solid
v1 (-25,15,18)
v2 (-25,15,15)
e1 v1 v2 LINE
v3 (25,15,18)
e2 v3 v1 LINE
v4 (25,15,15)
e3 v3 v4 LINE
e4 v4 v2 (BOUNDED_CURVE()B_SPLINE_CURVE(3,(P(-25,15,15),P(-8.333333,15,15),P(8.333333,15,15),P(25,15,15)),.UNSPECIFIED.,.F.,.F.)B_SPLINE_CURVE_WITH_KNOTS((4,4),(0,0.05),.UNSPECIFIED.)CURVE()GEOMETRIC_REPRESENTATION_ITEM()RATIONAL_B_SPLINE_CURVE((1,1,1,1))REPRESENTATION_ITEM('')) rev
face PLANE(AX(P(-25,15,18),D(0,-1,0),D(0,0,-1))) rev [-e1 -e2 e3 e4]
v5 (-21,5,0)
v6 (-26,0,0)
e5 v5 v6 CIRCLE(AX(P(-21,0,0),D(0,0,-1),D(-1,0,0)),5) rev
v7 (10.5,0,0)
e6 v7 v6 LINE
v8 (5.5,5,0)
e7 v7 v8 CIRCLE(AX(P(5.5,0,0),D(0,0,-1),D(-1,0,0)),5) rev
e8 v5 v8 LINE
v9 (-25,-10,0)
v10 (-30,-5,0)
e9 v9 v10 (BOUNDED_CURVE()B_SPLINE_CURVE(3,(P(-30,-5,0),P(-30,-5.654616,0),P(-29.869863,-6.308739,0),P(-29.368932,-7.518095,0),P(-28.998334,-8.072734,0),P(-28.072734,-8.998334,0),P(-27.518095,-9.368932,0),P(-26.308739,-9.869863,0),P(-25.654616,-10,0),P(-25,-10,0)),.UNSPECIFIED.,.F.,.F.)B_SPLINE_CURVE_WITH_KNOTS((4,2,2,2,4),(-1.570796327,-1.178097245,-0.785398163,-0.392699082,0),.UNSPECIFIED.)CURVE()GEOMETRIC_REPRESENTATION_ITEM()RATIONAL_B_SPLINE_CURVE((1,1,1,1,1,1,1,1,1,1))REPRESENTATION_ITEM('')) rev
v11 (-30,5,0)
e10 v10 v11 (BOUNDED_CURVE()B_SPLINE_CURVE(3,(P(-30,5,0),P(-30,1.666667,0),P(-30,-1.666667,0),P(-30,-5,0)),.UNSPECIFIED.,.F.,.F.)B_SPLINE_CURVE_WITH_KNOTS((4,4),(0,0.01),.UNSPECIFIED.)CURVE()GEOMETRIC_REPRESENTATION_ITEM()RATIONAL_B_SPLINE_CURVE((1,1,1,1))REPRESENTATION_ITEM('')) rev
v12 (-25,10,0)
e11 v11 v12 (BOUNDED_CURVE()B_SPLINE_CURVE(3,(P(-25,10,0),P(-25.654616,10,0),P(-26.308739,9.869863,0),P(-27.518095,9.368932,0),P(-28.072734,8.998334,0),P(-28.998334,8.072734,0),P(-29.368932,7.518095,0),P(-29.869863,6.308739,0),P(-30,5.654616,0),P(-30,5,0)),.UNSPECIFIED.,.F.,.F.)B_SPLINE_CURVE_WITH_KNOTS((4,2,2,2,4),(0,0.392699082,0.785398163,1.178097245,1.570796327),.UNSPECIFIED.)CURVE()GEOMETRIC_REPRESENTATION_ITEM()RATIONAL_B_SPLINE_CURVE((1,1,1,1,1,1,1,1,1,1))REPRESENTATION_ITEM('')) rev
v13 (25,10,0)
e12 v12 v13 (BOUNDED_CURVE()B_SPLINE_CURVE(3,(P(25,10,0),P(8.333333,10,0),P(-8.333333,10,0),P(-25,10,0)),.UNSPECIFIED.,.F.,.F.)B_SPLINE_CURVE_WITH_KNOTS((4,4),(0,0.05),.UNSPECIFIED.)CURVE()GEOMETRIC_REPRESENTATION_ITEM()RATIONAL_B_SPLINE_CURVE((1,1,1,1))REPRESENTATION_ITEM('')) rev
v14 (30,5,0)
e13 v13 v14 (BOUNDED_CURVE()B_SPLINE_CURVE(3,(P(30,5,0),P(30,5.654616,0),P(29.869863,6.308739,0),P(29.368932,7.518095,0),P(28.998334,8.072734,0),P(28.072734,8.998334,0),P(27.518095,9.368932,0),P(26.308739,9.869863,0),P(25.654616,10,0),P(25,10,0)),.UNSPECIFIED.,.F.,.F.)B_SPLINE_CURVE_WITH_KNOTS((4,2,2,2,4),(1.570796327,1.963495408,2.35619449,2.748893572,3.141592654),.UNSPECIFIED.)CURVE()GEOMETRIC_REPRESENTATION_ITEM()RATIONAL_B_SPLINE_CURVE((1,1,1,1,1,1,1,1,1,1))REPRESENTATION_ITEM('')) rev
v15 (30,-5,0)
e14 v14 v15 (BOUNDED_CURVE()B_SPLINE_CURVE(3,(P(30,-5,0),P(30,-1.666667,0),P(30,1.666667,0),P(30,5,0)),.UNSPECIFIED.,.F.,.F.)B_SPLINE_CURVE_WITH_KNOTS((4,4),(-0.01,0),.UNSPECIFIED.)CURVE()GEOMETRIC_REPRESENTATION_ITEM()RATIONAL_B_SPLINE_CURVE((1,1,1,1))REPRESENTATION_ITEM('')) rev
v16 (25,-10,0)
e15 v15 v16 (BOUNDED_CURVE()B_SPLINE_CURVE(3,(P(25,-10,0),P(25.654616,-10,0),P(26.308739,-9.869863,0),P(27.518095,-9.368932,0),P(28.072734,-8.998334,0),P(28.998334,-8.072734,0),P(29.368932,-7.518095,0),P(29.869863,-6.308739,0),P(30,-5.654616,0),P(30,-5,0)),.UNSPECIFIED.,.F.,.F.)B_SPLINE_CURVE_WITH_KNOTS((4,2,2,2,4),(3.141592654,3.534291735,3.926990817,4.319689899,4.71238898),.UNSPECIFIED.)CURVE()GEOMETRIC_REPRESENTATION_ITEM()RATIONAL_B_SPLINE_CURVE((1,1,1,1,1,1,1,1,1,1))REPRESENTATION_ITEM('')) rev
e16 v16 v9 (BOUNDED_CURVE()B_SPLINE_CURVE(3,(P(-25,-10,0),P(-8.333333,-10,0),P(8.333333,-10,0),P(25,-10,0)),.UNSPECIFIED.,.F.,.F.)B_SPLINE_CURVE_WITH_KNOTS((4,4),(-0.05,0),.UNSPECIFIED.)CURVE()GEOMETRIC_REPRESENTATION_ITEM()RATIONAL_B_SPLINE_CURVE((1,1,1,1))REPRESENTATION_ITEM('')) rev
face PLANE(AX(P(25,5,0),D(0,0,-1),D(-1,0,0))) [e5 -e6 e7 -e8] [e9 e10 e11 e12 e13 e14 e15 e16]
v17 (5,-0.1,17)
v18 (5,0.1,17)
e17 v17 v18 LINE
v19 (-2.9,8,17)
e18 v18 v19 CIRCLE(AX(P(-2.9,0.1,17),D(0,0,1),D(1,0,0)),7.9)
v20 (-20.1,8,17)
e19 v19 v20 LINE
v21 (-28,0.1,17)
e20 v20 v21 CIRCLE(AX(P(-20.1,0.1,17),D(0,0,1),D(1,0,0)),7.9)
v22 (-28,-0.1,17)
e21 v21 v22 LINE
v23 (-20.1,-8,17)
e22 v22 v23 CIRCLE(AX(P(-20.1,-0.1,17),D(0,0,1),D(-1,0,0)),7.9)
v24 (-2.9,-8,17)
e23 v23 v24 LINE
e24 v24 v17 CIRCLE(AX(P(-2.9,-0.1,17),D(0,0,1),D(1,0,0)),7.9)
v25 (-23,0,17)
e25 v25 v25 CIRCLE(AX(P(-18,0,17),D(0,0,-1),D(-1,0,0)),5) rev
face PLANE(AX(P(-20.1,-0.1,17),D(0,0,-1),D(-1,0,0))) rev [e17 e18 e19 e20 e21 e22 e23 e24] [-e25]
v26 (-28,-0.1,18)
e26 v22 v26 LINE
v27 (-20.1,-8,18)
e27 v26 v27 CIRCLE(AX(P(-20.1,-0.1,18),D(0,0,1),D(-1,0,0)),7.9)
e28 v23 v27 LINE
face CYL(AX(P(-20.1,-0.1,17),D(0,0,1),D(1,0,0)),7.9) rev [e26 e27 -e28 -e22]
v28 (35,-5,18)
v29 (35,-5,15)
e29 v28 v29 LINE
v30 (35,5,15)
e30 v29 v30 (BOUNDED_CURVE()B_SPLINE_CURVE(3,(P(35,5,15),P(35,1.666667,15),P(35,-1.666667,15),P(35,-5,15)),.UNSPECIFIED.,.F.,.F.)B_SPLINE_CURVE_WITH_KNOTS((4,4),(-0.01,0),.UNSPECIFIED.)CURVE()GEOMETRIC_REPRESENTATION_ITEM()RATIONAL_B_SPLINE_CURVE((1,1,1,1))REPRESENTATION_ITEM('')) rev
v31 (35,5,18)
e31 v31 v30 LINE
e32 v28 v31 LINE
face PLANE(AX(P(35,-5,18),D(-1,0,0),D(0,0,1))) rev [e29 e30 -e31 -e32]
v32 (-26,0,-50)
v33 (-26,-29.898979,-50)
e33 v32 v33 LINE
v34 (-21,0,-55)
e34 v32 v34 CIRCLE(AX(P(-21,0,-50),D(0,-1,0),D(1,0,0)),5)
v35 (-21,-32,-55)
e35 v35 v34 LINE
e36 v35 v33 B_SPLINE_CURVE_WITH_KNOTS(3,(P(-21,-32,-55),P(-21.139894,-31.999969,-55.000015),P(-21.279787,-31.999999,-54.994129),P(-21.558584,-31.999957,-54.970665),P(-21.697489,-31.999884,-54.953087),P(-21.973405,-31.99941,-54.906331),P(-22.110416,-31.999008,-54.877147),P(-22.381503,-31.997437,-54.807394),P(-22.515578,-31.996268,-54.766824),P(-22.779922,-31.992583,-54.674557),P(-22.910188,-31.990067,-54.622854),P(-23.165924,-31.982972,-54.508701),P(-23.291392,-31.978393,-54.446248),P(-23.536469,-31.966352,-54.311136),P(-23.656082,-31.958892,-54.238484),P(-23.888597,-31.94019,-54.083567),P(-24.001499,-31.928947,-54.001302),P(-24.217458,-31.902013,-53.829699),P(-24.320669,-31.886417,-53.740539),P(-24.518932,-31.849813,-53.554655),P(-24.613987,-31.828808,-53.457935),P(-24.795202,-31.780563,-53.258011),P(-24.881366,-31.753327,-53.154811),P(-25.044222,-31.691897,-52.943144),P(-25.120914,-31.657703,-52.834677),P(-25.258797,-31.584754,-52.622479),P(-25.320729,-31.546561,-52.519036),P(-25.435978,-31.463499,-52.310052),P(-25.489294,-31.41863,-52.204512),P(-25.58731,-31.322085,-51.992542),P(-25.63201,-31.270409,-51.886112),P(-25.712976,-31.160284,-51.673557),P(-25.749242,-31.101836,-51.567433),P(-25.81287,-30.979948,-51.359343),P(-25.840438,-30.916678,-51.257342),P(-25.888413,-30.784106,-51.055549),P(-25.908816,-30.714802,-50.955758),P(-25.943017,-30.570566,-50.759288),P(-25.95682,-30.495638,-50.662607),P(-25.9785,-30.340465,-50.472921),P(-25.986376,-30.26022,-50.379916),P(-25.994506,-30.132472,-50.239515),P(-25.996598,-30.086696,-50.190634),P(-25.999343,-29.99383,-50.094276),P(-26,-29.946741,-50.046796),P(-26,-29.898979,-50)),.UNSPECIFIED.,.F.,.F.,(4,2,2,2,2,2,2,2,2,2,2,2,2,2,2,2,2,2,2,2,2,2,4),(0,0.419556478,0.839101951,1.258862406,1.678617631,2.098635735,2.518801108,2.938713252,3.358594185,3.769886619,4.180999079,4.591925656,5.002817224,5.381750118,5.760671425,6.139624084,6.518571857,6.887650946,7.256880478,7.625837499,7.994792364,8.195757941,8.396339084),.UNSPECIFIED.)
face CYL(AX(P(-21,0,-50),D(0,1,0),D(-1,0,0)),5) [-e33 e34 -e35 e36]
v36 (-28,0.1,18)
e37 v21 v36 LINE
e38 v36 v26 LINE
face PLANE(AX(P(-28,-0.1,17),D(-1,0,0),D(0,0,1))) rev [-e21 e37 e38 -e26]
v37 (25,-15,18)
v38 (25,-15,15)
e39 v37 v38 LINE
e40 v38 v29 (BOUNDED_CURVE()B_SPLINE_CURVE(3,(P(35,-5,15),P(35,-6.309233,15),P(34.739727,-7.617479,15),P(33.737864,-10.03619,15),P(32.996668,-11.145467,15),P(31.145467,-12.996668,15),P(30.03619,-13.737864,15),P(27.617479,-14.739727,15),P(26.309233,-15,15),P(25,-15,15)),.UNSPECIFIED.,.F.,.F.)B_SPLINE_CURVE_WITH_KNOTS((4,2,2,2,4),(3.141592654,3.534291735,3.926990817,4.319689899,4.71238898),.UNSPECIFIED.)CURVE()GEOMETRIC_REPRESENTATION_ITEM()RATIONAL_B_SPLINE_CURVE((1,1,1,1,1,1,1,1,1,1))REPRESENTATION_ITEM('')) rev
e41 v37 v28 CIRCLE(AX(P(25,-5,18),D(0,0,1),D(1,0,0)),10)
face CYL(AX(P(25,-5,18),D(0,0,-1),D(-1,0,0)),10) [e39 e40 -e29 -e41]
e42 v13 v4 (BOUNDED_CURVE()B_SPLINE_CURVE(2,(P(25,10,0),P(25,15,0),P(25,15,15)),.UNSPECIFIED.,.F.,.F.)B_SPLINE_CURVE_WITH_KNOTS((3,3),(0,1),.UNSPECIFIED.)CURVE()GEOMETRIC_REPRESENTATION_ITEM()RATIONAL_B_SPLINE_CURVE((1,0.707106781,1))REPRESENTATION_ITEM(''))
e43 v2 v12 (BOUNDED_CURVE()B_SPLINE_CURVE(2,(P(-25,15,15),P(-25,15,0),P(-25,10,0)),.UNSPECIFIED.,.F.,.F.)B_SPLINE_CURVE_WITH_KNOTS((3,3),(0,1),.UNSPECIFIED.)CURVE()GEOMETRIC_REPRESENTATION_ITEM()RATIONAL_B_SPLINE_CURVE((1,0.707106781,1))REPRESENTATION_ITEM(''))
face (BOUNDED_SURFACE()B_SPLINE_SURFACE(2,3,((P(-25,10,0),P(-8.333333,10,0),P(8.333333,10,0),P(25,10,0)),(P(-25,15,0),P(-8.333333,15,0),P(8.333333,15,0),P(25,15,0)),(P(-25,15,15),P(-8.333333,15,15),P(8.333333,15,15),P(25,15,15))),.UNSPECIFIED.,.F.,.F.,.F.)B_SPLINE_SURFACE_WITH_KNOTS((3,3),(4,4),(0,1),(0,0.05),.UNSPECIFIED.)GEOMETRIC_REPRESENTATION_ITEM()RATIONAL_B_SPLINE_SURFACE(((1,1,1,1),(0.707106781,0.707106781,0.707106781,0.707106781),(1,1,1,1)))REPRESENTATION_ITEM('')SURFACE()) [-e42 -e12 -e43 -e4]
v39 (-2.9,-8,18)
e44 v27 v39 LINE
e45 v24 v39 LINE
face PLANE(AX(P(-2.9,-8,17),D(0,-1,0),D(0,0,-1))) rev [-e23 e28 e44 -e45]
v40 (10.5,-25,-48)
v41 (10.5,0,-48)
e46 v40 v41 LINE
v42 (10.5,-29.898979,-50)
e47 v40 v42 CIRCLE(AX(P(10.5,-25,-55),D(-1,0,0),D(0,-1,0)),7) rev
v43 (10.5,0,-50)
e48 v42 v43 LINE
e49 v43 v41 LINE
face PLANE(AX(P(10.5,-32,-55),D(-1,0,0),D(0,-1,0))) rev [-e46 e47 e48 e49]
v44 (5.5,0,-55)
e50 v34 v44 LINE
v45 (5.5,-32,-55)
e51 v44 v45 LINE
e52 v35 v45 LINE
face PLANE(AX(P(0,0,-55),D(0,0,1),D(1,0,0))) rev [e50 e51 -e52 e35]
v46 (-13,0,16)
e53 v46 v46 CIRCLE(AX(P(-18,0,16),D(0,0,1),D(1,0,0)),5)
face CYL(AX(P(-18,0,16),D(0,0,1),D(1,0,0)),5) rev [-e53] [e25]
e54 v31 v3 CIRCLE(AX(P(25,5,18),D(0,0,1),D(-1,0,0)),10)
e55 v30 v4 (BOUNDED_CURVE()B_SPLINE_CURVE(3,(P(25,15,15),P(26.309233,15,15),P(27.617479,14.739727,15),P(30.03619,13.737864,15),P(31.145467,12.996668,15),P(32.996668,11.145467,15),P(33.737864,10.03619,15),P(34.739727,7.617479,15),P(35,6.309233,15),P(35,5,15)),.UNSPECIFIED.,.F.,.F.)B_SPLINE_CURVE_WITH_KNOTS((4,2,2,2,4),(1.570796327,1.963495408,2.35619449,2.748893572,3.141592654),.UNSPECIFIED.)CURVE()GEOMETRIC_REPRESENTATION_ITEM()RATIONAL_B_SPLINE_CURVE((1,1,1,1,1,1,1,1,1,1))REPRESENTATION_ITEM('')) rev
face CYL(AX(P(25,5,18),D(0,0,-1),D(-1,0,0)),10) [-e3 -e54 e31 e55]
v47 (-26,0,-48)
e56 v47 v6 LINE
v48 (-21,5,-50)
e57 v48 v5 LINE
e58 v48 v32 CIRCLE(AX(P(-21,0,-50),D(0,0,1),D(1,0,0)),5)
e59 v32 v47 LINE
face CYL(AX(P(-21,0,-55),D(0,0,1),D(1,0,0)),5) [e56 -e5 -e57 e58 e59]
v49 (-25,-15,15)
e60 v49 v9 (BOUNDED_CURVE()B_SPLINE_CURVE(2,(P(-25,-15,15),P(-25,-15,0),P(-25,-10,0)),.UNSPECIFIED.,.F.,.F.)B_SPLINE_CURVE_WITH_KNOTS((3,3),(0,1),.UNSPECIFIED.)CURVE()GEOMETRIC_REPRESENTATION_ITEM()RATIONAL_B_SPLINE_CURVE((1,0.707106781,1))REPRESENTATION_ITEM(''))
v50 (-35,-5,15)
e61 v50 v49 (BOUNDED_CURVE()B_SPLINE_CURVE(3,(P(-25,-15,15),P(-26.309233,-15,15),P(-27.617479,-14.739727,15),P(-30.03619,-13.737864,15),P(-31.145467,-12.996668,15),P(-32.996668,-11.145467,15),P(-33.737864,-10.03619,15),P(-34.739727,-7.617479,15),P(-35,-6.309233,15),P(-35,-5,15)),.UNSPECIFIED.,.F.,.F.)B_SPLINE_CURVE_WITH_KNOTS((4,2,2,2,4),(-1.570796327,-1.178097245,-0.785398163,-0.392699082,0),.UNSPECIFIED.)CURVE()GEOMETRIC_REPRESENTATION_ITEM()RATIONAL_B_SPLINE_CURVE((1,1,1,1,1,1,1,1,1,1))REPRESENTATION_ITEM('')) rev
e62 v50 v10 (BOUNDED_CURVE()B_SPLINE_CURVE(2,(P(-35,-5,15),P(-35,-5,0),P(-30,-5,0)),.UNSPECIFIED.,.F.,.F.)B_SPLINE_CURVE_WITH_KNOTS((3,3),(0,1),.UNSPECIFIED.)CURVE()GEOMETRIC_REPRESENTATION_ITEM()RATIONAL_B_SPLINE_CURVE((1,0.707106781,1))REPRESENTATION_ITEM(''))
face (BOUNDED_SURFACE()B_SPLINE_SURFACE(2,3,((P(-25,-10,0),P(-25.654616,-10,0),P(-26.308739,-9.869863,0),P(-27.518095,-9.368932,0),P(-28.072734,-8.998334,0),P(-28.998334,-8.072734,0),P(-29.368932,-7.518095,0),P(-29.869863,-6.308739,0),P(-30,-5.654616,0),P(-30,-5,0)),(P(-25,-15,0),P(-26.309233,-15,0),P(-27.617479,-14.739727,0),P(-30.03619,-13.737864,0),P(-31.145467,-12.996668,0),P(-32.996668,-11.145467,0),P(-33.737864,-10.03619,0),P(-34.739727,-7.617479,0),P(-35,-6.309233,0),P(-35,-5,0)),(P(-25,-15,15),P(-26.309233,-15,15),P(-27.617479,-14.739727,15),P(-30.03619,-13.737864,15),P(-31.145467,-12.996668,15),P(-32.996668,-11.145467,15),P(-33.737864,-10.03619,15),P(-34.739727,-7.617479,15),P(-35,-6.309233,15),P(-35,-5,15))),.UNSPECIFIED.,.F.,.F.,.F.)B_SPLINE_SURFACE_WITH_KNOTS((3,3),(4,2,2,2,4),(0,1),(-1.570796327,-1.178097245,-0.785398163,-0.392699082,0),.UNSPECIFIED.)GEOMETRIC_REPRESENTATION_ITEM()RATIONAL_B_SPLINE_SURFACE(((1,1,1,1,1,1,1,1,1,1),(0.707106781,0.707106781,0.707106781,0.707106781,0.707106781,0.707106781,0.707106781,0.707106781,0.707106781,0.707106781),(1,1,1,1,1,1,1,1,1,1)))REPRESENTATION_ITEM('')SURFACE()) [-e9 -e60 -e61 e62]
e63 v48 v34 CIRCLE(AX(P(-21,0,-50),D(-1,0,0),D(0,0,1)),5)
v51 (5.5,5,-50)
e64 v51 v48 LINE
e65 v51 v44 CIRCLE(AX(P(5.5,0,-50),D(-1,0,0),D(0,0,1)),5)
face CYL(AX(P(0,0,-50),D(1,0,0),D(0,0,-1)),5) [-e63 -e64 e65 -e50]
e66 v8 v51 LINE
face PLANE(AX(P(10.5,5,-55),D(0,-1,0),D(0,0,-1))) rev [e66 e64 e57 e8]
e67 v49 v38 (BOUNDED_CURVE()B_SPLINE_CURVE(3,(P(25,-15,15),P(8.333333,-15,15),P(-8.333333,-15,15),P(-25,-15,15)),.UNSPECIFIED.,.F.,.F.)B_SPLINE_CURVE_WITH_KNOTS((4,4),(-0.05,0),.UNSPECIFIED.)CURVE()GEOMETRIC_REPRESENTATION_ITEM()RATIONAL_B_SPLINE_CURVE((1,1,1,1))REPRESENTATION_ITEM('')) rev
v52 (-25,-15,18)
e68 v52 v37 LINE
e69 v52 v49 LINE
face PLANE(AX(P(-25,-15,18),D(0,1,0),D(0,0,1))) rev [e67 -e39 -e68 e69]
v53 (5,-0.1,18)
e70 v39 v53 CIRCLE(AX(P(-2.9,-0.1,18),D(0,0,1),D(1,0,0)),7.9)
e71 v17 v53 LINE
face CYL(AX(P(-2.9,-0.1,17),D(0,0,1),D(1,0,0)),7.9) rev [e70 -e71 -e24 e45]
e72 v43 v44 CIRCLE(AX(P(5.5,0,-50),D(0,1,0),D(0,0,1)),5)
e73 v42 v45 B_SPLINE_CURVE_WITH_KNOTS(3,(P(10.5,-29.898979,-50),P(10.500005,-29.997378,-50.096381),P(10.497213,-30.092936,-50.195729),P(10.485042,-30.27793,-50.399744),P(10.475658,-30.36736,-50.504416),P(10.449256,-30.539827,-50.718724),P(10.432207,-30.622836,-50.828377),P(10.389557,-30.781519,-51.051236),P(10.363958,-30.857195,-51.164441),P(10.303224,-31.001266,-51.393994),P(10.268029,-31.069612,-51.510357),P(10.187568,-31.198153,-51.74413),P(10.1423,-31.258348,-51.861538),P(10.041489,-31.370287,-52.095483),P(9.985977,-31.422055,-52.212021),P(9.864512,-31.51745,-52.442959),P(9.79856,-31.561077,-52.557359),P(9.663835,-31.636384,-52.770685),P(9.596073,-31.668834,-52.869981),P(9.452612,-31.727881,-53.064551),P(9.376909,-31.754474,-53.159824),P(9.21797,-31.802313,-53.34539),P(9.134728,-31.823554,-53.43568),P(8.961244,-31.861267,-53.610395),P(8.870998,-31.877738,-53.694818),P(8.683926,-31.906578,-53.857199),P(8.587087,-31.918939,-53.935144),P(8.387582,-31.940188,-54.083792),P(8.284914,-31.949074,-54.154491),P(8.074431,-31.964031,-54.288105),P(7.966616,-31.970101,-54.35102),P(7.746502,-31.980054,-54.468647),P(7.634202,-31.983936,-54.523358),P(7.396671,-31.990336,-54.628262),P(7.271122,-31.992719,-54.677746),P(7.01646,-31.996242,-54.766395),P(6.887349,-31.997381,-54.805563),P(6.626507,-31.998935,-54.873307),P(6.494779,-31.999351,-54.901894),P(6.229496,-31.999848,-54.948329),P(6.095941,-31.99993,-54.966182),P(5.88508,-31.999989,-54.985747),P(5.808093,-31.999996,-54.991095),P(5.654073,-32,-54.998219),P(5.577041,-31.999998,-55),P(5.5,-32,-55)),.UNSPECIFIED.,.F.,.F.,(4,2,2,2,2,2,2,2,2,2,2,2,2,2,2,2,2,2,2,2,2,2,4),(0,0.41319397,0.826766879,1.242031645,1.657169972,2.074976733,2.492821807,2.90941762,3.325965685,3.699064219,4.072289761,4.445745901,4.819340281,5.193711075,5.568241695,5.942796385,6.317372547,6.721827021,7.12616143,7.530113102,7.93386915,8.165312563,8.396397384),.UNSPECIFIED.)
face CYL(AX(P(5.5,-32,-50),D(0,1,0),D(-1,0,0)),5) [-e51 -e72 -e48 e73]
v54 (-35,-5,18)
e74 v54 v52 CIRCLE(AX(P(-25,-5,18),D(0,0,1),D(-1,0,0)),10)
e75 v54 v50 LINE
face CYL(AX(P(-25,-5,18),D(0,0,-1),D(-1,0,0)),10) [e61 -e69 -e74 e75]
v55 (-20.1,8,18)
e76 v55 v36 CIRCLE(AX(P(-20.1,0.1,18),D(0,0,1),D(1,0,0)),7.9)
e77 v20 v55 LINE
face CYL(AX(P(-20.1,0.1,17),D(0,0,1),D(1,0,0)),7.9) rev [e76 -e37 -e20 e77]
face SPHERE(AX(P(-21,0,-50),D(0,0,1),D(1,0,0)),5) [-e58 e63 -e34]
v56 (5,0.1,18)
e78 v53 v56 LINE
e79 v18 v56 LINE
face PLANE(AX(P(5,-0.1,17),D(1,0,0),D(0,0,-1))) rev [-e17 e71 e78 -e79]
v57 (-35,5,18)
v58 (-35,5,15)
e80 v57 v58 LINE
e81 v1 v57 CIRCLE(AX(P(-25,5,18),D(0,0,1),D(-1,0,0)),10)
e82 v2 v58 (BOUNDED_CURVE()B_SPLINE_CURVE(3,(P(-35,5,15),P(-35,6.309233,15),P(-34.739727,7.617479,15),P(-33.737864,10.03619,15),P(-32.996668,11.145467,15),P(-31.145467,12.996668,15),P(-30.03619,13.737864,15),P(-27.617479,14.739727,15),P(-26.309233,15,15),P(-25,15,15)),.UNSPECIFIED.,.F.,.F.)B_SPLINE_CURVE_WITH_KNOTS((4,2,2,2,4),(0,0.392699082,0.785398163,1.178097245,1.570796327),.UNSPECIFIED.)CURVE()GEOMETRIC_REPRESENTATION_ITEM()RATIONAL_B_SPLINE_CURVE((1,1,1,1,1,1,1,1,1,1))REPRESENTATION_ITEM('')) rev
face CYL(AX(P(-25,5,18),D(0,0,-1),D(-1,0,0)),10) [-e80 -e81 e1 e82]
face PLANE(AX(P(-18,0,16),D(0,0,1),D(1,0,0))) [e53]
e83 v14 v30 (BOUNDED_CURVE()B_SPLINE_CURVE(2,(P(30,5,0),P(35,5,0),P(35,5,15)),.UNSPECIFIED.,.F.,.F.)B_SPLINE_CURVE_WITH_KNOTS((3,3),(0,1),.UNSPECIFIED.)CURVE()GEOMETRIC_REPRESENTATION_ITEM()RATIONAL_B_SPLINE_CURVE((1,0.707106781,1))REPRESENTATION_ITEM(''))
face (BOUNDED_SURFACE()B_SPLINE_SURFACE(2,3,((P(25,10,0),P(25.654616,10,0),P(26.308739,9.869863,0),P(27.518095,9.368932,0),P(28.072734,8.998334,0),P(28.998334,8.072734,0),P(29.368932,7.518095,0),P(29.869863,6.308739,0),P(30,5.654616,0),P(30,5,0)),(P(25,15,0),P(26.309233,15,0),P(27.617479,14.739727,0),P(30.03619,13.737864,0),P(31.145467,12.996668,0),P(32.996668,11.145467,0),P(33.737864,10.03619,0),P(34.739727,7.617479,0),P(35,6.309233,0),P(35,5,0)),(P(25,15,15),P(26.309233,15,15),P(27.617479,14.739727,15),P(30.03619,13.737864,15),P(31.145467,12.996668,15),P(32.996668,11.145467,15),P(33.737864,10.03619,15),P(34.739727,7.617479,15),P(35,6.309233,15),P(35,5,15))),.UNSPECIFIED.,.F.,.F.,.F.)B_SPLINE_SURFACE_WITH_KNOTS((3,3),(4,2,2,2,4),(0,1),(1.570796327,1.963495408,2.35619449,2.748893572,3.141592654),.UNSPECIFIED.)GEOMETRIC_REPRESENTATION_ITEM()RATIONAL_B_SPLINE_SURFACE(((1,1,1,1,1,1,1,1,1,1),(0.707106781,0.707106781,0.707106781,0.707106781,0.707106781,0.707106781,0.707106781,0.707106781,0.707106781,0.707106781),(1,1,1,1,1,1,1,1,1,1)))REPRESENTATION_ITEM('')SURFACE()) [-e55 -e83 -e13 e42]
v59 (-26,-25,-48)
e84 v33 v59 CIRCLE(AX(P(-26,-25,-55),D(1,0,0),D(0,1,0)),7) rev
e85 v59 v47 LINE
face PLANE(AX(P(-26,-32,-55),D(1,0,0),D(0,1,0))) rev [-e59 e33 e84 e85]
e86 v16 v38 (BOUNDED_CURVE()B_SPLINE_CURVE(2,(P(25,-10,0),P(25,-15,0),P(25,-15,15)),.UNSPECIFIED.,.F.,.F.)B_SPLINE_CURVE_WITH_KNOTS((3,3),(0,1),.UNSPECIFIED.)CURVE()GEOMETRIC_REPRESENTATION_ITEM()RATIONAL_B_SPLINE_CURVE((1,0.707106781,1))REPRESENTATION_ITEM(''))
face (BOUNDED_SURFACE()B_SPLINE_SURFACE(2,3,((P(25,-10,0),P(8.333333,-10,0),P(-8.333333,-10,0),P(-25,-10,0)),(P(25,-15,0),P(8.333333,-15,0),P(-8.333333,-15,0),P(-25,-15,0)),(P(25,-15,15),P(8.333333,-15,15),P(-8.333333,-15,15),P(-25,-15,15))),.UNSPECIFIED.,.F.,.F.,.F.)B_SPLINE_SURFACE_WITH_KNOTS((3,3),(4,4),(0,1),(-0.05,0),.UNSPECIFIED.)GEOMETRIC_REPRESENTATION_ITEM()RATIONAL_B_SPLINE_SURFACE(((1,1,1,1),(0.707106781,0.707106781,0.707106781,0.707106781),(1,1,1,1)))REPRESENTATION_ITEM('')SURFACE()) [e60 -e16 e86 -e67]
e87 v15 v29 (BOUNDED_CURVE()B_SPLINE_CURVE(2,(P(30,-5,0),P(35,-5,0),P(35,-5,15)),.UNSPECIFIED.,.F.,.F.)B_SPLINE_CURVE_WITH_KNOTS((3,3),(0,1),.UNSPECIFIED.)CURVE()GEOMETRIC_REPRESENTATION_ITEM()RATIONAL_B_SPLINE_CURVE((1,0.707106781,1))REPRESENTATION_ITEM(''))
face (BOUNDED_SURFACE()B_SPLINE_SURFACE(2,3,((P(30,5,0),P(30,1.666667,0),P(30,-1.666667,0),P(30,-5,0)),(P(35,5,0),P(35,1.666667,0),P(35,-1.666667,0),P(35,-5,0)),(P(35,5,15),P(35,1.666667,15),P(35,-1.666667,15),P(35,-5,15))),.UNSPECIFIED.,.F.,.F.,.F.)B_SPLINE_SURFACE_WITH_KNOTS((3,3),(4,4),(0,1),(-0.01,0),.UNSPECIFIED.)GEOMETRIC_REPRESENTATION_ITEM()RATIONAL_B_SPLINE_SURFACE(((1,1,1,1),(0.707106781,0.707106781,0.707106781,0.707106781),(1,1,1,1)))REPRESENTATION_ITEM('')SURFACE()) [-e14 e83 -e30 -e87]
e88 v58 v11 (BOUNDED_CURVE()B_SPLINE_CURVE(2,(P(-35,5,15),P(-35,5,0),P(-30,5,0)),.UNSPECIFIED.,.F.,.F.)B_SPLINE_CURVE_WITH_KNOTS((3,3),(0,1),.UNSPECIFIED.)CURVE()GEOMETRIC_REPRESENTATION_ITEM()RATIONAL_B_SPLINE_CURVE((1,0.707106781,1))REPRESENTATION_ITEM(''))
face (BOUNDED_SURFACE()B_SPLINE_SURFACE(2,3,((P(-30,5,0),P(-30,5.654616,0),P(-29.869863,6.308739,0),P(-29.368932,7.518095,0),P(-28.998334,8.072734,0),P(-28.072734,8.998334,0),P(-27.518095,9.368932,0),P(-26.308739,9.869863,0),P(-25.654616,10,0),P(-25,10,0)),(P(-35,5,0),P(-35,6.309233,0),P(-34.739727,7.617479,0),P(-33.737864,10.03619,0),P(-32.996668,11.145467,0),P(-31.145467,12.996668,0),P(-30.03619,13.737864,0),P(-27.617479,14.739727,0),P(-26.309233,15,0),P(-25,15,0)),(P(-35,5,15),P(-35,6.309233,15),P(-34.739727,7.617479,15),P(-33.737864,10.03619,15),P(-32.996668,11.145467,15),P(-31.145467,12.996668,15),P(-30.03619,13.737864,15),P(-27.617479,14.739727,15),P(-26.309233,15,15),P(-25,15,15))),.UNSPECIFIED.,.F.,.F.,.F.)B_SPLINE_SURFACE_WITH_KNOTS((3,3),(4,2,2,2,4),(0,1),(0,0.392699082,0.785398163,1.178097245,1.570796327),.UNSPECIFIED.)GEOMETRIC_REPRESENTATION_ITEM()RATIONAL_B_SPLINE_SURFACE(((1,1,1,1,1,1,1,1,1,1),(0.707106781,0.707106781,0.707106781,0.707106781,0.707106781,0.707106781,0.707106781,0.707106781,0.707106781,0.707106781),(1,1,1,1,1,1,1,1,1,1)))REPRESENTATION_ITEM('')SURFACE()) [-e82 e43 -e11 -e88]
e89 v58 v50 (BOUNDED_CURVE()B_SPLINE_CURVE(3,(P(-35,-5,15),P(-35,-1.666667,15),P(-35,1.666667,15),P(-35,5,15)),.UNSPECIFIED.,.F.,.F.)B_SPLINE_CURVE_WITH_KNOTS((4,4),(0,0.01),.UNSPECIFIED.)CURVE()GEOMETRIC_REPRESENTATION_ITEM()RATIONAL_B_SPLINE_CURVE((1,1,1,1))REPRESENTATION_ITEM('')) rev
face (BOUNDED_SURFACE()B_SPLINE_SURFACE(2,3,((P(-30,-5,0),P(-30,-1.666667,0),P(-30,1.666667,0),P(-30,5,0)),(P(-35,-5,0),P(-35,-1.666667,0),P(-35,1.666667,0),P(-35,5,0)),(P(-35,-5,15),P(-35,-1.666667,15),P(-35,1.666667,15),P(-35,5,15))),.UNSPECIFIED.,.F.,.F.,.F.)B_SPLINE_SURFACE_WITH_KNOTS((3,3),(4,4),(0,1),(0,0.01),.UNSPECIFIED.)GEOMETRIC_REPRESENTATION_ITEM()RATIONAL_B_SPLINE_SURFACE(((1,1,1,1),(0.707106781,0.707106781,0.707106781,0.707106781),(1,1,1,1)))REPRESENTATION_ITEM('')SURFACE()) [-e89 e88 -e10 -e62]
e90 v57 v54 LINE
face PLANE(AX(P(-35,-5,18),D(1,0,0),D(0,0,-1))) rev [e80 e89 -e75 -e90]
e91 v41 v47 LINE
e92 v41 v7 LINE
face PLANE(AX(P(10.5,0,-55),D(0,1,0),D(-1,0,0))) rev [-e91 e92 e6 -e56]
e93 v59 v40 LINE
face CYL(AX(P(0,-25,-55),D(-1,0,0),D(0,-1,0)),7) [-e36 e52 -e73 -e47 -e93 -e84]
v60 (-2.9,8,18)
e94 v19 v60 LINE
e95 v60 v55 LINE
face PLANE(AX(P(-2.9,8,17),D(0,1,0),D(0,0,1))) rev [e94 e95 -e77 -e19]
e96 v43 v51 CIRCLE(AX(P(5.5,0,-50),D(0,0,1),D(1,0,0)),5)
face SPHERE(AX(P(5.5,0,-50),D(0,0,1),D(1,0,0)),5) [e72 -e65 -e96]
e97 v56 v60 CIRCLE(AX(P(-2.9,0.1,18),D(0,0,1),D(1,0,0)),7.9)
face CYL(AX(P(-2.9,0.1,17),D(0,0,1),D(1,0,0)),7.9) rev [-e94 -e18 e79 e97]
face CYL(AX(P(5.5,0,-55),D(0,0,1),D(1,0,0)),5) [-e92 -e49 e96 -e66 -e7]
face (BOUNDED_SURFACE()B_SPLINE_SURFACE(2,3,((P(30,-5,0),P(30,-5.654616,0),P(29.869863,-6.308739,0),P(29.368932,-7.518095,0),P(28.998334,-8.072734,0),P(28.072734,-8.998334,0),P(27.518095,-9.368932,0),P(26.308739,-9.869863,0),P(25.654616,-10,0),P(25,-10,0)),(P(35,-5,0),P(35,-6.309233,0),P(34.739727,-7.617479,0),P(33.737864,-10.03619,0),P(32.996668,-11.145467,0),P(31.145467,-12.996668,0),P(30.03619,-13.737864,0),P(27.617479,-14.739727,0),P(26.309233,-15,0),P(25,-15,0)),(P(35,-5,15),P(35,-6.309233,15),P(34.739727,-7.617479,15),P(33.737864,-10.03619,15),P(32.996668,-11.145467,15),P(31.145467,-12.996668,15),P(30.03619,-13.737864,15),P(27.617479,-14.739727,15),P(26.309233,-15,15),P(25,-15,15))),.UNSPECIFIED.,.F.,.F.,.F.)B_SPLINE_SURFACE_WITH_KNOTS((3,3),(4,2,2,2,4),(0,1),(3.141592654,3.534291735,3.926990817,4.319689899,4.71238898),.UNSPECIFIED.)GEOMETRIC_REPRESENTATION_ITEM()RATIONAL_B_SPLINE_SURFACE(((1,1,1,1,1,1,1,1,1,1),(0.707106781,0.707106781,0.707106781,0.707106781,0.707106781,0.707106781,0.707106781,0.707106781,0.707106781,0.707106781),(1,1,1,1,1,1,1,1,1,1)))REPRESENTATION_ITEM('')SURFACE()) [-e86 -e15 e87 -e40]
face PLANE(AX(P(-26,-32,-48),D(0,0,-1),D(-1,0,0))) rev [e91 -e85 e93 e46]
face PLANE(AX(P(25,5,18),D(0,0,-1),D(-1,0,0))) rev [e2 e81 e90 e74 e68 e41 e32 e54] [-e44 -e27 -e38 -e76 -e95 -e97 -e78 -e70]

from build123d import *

# Parameters (mm, degrees)
RESSALTO_EXTRUS_O1_DEPTH = 18
FILETE1_SIZE             = 15
FILETE1_SIZE_2           = 5
ESBO_O2_R                = 5
CORTE_EXTRUS_O1_DEPTH    = 2
CORTE_EXTRUS_O2_DEPTH    = 1
ESBO_O4_W                = 36.5
ESBO_O4_H                = 5
RESSALTO_EXTRUS_O2_DEPTH = 55
FILETE2_R                = 5
ESBO_O5_W                = 36.5
ESBO_O5_H                = 7
RESSALTO_EXTRUS_O3_DEPTH = 32
FILETE3_R                = 5
FILETE4_R                = 7


# Some blends are built 0.0001 mm under size
with BuildPart() as part:
    # Esboço1 → Ressalto-extrusão1 (new body)
    with BuildSketch(Plane.XY):
        with BuildLine():
            Line((-25, -15), (25, -15))
            ThreePointArc((25, -15), (32.071067812, -12.071067812), (35, -5))
            Line((35, -5), (35, 5))
            ThreePointArc((35, 5), (32.071067812, 12.071067812), (25, 15))
            Line((25, 15), (-25, 15))
            ThreePointArc((-25, 15), (-32.071067812, 12.071067812), (-35, 5))
            Line((-35, 5), (-35, -5))
            ThreePointArc((-35, -5), (-32.071067812, -12.071067812), (-25, -15))
        make_face()
    extrude(amount=RESSALTO_EXTRUS_O1_DEPTH)

    # Filete1
    # an asymmetric fillet: 15, 5 mm, written as the material it takes off along each edge
    with BuildSketch(Plane(origin=(25, 15, 0), x_dir=(0, 0, 1), z_dir=(-1, 0, 0)), Plane(origin=(-25, -15, 0), x_dir=(0, 0, 1), z_dir=(1, 0, 0))) as filete1_piece_1:
        with BuildLine():
            Bezier((FILETE1_SIZE, 0), (0, 0), (0, -FILETE1_SIZE_2), weights=[1, 0.707106781, 1])
            Line((0, -FILETE1_SIZE_2), (0, 0))
            Line((0, 0), (FILETE1_SIZE, 0))
        make_face()
    extrude(amount=50, mode=Mode.SUBTRACT)
    with BuildSketch(Plane(origin=(25, 5, 0), x_dir=(1, 0, 0), z_dir=(0, -1, 0))) as filete1_piece_2:
        with BuildLine():
            Bezier((10, FILETE1_SIZE), (10, 0), (10 - FILETE1_SIZE_2, 0), weights=[1, 0.707106781, 1])
            Line((10 - FILETE1_SIZE_2, 0), (10, 0))
            Line((10, 0), (10, FILETE1_SIZE))
        make_face()
    revolve(axis=Axis((25, 5, 0), (0, 0, 1)), revolution_arc=90, mode=Mode.SUBTRACT)
    with BuildSketch(Plane(origin=(35, -5, 0), x_dir=(0, 0, 1), z_dir=(0, 1, 0)), Plane(origin=(-35, 5, 0), x_dir=(0, 0, 1), z_dir=(0, -1, 0))) as filete1_piece_3:
        with BuildLine():
            Bezier((FILETE1_SIZE, 0), (0, 0), (0, -FILETE1_SIZE_2), weights=[1, 0.707106781, 1])
            Line((0, -FILETE1_SIZE_2), (0, 0))
            Line((0, 0), (FILETE1_SIZE, 0))
        make_face()
    extrude(amount=10, mode=Mode.SUBTRACT)
    with BuildSketch(Plane(origin=(25, -5, 0), x_dir=(0, -1, 0), z_dir=(-1, 0, 0))) as filete1_piece_4:
        with BuildLine():
            Bezier((10, FILETE1_SIZE), (10, 0), (10 - FILETE1_SIZE_2, 0), weights=[1, 0.707106781, 1])
            Line((10 - FILETE1_SIZE_2, 0), (10, 0))
            Line((10, 0), (10, FILETE1_SIZE))
        make_face()
    revolve(axis=Axis((25, -5, 0), (0, 0, 1)), revolution_arc=90, mode=Mode.SUBTRACT)
    with BuildSketch(Plane(origin=(-25, -5, 0), x_dir=(-1, 0, 0), z_dir=(0, 1, 0))) as filete1_piece_5:
        with BuildLine():
            Bezier((10, FILETE1_SIZE), (10, 0), (10 - FILETE1_SIZE_2, 0), weights=[1, 0.707106781, 1])
            Line((10 - FILETE1_SIZE_2, 0), (10, 0))
            Line((10, 0), (10, FILETE1_SIZE))
        make_face()
    revolve(axis=Axis((-25, -5, 0), (0, 0, 1)), revolution_arc=90, mode=Mode.SUBTRACT)
    with BuildSketch(Plane(origin=(-25, 5, 0), x_dir=(0, 1, 0), z_dir=(1, 0, 0))) as filete1_piece_6:
        with BuildLine():
            Bezier((10, FILETE1_SIZE), (10, 0), (10 - FILETE1_SIZE_2, 0), weights=[1, 0.707106781, 1])
            Line((10 - FILETE1_SIZE_2, 0), (10, 0))
            Line((10, 0), (10, FILETE1_SIZE))
        make_face()
    revolve(axis=Axis((-25, 5, 0), (0, 0, 1)), revolution_arc=90, mode=Mode.SUBTRACT)

    # Esboço2 → Corte-extrusão1 (cut)
    with BuildSketch(Plane.XY.offset(18)):
        with Locations((-18, 0)):
            Circle(ESBO_O2_R)
    extrude(amount=-CORTE_EXTRUS_O1_DEPTH, mode=Mode.SUBTRACT)

    # Esboço3 → Corte-extrusão2 (cut)
    with BuildSketch(Plane.XY.offset(18)):
        with BuildLine():
            Line((-2.9, -8), (-20.1, -8))
            ThreePointArc((-20.1, -8), (-25.686143571, -5.686143571), (-28, -0.1))
            Line((-28, -0.1), (-28, 0.1))
            ThreePointArc((-28, 0.1), (-25.686143571, 5.686143571), (-20.1, 8))
            Line((-20.1, 8), (-2.9, 8))
            ThreePointArc((-2.9, 8), (2.686143571, 5.686143571), (5, 0.1))
            Line((5, 0.1), (5, -0.1))
            ThreePointArc((5, -0.1), (2.686143571, -5.686143571), (-2.9, -8))
        make_face()
    extrude(amount=-CORTE_EXTRUS_O2_DEPTH, mode=Mode.SUBTRACT)

    # Esboço4 → Ressalto-extrusão2 (add)
    with BuildSketch(Plane(origin=(0, 0, 0), x_dir=(-1, 0, 0), z_dir=(0, 0, -1))):
        with Locations((7.75, 2.5)):
            Rectangle(ESBO_O4_W, ESBO_O4_H)
    extrude(amount=RESSALTO_EXTRUS_O2_DEPTH)

    # Filete2
    filete2_edges = [part.edges().sort_by_distance(p)[0] for p in [
        (-26, 5, -27.5),
        (10.5, 5, -27.5),
    ]]
    fillet(filete2_edges, radius=FILETE2_R - 0.0001)  # a hair under: the kernel refuses the full size

    # Esboço5 → Ressalto-extrusão3 (add)
    with BuildSketch(Plane.XZ):
        with Locations((-7.75, -51.5)):
            Rectangle(ESBO_O5_W, ESBO_O5_H)
    extrude(amount=RESSALTO_EXTRUS_O3_DEPTH)

    # Filete3
    filete3_edges = [part.edges().sort_by_distance(p)[0] for p in [
        (-7.75, 5, -55),
        (9.035563195, 3.535563195, -55),
        (-24.535563195, 3.535563195, -55),
        (-26, -15.99995, -55),
        (10.5, -15.99995, -55),
    ]]
    fillet(filete3_edges, radius=FILETE3_R - 0.0001)  # a hair under: the kernel refuses the full size

    # Filete4
    filete4_edges = [part.edges().sort_by_distance(p)[0] for p in [
        (-7.75, -32, -48),
    ]]
    fillet(filete4_edges, radius=FILETE4_R - 0.0001)  # a hair under: the kernel refuses the full size


solid = part.part
